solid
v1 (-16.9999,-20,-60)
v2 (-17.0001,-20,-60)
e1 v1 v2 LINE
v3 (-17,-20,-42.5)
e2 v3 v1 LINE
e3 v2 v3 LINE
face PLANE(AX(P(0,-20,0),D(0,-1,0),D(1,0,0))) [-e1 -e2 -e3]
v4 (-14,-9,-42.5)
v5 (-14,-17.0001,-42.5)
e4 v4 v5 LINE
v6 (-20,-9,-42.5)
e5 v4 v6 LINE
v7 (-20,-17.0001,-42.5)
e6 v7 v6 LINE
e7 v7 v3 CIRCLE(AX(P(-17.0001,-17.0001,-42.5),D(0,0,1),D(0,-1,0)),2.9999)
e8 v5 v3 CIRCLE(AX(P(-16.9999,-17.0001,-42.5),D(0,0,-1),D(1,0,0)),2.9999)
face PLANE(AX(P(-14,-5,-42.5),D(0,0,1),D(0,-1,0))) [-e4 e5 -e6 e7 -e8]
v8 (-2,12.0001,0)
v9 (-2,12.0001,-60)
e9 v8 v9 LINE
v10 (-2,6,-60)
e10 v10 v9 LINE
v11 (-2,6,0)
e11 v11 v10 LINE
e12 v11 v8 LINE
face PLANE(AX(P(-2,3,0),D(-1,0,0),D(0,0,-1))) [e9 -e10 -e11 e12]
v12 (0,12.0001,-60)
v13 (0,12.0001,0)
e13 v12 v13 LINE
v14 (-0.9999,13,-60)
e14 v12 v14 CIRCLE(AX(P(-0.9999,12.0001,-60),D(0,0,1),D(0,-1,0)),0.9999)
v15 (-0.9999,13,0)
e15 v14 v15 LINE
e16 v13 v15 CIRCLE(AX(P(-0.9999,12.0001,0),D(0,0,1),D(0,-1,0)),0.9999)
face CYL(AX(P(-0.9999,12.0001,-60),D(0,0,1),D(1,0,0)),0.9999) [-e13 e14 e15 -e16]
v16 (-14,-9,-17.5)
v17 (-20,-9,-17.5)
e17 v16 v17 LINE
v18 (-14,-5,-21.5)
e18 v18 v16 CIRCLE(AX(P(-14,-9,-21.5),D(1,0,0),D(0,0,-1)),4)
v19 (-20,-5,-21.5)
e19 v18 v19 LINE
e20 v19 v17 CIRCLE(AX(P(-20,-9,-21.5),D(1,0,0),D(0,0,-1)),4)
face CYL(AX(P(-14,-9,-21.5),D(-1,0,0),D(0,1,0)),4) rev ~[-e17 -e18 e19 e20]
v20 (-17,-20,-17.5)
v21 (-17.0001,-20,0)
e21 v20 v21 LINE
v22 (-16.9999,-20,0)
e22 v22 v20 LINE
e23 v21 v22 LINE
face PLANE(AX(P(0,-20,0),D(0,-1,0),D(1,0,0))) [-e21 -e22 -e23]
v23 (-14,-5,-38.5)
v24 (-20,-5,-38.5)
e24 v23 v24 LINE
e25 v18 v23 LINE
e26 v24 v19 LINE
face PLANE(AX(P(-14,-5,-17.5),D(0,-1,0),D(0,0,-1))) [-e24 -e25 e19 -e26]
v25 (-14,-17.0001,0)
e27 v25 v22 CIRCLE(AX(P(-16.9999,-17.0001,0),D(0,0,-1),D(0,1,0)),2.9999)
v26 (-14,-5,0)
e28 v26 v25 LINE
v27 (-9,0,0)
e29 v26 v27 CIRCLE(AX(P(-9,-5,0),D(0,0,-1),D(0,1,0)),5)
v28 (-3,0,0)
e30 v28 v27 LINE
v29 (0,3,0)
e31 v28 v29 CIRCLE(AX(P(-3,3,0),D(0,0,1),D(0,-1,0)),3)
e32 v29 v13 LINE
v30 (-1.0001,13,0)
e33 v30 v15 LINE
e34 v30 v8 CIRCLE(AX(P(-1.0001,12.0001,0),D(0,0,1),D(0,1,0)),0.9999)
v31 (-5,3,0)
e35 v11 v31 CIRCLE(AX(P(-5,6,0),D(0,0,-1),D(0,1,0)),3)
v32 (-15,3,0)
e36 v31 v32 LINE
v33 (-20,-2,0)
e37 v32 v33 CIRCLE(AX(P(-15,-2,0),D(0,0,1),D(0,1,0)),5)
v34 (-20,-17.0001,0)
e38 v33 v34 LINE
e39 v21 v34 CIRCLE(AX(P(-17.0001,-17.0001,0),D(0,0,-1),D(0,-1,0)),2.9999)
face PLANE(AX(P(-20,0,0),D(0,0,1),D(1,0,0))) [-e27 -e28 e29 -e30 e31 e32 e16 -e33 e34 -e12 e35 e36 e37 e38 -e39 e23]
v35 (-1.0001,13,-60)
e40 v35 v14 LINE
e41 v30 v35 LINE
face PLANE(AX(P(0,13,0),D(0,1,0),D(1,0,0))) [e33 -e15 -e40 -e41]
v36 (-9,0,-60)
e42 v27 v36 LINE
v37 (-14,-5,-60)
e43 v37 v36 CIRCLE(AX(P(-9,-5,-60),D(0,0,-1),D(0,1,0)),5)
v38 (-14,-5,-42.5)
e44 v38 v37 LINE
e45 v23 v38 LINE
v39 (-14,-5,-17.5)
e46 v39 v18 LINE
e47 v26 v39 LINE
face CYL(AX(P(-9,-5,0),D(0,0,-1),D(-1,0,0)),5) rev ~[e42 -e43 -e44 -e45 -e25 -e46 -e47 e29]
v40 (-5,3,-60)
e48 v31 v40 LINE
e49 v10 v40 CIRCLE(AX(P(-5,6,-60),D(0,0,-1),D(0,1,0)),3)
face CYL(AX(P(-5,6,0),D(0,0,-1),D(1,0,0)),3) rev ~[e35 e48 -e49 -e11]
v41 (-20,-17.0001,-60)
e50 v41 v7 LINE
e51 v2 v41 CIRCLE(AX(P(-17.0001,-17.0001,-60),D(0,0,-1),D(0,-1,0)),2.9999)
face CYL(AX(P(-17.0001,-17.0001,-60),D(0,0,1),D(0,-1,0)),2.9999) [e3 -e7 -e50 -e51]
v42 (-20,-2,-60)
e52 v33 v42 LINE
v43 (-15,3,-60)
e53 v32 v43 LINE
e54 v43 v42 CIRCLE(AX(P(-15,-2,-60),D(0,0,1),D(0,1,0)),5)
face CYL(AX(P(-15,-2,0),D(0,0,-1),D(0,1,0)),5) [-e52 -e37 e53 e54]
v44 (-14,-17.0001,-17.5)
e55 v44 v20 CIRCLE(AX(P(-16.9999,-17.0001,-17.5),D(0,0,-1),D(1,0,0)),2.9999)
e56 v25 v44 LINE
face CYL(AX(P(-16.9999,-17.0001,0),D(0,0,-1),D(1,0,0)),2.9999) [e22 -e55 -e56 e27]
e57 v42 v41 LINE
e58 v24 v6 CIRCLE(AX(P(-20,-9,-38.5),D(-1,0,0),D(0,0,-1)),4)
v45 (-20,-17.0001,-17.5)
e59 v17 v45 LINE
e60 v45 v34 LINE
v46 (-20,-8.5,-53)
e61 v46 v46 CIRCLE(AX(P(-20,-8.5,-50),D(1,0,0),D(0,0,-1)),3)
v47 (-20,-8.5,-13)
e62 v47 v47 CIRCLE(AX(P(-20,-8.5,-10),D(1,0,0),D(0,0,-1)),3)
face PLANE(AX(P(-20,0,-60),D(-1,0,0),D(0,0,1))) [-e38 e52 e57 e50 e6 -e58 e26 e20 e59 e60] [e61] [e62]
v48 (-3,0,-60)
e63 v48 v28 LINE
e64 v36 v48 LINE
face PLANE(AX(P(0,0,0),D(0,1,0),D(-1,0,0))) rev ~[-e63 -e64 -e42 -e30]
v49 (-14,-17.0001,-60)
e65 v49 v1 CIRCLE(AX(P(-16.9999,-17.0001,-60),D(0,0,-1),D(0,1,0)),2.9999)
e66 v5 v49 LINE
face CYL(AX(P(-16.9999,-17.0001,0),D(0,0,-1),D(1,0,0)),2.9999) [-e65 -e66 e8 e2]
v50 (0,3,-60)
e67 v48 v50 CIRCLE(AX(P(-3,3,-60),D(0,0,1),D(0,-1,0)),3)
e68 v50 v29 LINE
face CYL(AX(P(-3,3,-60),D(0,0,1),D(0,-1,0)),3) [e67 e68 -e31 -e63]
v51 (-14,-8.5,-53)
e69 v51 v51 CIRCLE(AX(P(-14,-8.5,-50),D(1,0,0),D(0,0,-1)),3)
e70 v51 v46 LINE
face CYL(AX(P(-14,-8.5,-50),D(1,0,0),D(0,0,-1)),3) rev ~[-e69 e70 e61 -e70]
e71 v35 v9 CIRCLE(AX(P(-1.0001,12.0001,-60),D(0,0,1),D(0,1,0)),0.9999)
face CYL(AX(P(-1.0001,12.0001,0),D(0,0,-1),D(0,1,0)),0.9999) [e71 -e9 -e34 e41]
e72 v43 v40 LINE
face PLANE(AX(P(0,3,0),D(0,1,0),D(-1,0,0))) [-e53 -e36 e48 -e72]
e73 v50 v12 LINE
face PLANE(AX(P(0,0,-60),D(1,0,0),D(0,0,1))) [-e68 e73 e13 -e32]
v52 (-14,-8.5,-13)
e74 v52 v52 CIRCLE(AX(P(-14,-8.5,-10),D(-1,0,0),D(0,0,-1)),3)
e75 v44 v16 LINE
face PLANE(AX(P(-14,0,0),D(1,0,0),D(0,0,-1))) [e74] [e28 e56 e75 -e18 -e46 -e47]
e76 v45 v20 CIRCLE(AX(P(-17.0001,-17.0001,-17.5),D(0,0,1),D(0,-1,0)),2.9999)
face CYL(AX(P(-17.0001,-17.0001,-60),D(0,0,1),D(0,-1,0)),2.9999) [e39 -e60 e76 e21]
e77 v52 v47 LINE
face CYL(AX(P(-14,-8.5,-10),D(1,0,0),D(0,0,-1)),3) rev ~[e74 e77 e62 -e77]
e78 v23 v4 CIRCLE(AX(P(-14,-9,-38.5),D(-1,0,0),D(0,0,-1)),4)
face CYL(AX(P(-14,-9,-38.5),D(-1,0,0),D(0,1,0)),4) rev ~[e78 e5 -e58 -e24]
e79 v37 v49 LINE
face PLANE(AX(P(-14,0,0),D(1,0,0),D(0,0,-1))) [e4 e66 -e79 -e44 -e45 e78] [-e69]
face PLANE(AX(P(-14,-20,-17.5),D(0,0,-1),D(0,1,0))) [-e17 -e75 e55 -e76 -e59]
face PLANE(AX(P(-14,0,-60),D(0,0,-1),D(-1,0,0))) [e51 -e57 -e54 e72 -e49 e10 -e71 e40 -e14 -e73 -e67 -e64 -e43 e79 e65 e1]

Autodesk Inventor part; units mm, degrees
ref_plane "YZ Plane" through (0, 0, 0) normal (1, 0, 0) x (0, 1, 0)
ref_plane "XZ Plane" through (0, 0, 0) normal (0, 1, 0) x (-1, 0, 0)
ref_plane "XY Plane" through (0, 0, 0) normal (0, 0, 1) x (1, 0, 0)
sketch "Sketch1" plane through (0, 0, 0) normal (0, 1, 0) x (-1, 0, 0)
  line L0 (0, 0) -> (20, 0)
  line L1 (20, 0) -> (20, -60)
  line L2 (20, -60) -> (0, -60)
  line L3 (0, -60) -> (0, 0)
  dimension "d0" = 20
  dimension "d1" = 60
extrude "Extrusion1" add sketch "Sketch1" along normal blind 3
sketch "Sketch2" plane through (0, 3, 0) normal (0, 1, 0) x (1, 0, 0)
  line L0 (-20, 0) -> (0, 0) projected
  line L1 (0, 0) -> (-2, 0)
  line L2 (-2, 0) -> (-2, 60)
  line L3 (-2, 60) -> (0, 60)
  line L4 (0, 60) -> (0, 0)
  dimension "d4" = 2
  dimension "d5" = 60
extrude "Extrusion2" add sketch "Sketch2" along normal blind 10
sketch "Sketch3" plane through (0, 0, 0) normal (0, -1, 0) x (1, 0, 0)
  line L0 (-20, 0) -> (0, 0) projected
  line L1 (0, -60) -> (-20, -60) projected
  line L2 (-20, 0) -> (-14, 0)
  line L3 (-14, 0) -> (-14, -60)
  line L4 (-14, -60) -> (-20, -60)
  line L5 (-20, -60) -> (-20, 0)
  dimension "d8" = 6
extrude "Extrusion3" add sketch "Sketch3" along normal blind 20
sketch "Sketch4" plane through (-14, 0, 0) normal (1, 0, 0) x (0, 0, -1)
  line L0 (0, -20) -> (0, 3) projected
  line L1 (0, -8.5) -> (10, -8.5)
  line L2 (60, 0) -> (60, -20) projected
  circle A0 centre (10, -8.5) radius 3
  line L3 (60, -20) -> (0, -20) projected
  line L4 (0, -20) -> (60, -20)
  circle A1 centre (50, -8.5) radius 3
  point P0 (0, 0)
  dimension "d11" = 10
  dimension "d12" = 6
  dimension "d15" = 40
extrude "Extrusion4" cut sketch "Sketch4" against normal through all
fillet "Fillet1" radius 5 2 edges at (-20, 3, -30) (-14, 0, -30)
fillet "Fillet2" radius 3 2 edges at (-14, -20, -30) (-20, -20, -30)
fillet "Fillet3" radius 3 2 edges at (-2, 3, -30) (0, 0, -30)
fillet "Fillet4" radius 1 2 edges at (0, 13, -30) (-2, 13, -30)
sketch "Sketch5" plane through (-14, -5, 0) normal (1, 0, 0) x (0, 0, -1)
  line L0 (0, 0) -> (60, 0) projected
  line L1 (0, 0) -> (30, 0)
  line L2 (30, 0) -> (30, -7.5)
  line L3 (60, -15) -> (0, -15) projected
  line L4 (42.5, -15) -> (17.5, -15)
  line L5 (17.5, -15) -> (17.5, 0)
  line L6 (17.5, 0) -> (42.5, 0)
  line L7 (42.5, 0) -> (42.5, -15)
  line L8 (42.5, -15) -> (17.5, 0) construction
  line L9 (17.5, -15) -> (42.5, 0) construction
  point P0 (0, 5)
  dimension "d26" = 7.5
  dimension "d27" = 25
  dimension "d28" = 15
extrude "Extrusion5" cut sketch "Sketch5" against normal through all
fillet "Fillet5" radius 4 2 edges at (-17, -5, -42.5) (-17, -5, -17.5)
properties part number "CableChain_Holder"
